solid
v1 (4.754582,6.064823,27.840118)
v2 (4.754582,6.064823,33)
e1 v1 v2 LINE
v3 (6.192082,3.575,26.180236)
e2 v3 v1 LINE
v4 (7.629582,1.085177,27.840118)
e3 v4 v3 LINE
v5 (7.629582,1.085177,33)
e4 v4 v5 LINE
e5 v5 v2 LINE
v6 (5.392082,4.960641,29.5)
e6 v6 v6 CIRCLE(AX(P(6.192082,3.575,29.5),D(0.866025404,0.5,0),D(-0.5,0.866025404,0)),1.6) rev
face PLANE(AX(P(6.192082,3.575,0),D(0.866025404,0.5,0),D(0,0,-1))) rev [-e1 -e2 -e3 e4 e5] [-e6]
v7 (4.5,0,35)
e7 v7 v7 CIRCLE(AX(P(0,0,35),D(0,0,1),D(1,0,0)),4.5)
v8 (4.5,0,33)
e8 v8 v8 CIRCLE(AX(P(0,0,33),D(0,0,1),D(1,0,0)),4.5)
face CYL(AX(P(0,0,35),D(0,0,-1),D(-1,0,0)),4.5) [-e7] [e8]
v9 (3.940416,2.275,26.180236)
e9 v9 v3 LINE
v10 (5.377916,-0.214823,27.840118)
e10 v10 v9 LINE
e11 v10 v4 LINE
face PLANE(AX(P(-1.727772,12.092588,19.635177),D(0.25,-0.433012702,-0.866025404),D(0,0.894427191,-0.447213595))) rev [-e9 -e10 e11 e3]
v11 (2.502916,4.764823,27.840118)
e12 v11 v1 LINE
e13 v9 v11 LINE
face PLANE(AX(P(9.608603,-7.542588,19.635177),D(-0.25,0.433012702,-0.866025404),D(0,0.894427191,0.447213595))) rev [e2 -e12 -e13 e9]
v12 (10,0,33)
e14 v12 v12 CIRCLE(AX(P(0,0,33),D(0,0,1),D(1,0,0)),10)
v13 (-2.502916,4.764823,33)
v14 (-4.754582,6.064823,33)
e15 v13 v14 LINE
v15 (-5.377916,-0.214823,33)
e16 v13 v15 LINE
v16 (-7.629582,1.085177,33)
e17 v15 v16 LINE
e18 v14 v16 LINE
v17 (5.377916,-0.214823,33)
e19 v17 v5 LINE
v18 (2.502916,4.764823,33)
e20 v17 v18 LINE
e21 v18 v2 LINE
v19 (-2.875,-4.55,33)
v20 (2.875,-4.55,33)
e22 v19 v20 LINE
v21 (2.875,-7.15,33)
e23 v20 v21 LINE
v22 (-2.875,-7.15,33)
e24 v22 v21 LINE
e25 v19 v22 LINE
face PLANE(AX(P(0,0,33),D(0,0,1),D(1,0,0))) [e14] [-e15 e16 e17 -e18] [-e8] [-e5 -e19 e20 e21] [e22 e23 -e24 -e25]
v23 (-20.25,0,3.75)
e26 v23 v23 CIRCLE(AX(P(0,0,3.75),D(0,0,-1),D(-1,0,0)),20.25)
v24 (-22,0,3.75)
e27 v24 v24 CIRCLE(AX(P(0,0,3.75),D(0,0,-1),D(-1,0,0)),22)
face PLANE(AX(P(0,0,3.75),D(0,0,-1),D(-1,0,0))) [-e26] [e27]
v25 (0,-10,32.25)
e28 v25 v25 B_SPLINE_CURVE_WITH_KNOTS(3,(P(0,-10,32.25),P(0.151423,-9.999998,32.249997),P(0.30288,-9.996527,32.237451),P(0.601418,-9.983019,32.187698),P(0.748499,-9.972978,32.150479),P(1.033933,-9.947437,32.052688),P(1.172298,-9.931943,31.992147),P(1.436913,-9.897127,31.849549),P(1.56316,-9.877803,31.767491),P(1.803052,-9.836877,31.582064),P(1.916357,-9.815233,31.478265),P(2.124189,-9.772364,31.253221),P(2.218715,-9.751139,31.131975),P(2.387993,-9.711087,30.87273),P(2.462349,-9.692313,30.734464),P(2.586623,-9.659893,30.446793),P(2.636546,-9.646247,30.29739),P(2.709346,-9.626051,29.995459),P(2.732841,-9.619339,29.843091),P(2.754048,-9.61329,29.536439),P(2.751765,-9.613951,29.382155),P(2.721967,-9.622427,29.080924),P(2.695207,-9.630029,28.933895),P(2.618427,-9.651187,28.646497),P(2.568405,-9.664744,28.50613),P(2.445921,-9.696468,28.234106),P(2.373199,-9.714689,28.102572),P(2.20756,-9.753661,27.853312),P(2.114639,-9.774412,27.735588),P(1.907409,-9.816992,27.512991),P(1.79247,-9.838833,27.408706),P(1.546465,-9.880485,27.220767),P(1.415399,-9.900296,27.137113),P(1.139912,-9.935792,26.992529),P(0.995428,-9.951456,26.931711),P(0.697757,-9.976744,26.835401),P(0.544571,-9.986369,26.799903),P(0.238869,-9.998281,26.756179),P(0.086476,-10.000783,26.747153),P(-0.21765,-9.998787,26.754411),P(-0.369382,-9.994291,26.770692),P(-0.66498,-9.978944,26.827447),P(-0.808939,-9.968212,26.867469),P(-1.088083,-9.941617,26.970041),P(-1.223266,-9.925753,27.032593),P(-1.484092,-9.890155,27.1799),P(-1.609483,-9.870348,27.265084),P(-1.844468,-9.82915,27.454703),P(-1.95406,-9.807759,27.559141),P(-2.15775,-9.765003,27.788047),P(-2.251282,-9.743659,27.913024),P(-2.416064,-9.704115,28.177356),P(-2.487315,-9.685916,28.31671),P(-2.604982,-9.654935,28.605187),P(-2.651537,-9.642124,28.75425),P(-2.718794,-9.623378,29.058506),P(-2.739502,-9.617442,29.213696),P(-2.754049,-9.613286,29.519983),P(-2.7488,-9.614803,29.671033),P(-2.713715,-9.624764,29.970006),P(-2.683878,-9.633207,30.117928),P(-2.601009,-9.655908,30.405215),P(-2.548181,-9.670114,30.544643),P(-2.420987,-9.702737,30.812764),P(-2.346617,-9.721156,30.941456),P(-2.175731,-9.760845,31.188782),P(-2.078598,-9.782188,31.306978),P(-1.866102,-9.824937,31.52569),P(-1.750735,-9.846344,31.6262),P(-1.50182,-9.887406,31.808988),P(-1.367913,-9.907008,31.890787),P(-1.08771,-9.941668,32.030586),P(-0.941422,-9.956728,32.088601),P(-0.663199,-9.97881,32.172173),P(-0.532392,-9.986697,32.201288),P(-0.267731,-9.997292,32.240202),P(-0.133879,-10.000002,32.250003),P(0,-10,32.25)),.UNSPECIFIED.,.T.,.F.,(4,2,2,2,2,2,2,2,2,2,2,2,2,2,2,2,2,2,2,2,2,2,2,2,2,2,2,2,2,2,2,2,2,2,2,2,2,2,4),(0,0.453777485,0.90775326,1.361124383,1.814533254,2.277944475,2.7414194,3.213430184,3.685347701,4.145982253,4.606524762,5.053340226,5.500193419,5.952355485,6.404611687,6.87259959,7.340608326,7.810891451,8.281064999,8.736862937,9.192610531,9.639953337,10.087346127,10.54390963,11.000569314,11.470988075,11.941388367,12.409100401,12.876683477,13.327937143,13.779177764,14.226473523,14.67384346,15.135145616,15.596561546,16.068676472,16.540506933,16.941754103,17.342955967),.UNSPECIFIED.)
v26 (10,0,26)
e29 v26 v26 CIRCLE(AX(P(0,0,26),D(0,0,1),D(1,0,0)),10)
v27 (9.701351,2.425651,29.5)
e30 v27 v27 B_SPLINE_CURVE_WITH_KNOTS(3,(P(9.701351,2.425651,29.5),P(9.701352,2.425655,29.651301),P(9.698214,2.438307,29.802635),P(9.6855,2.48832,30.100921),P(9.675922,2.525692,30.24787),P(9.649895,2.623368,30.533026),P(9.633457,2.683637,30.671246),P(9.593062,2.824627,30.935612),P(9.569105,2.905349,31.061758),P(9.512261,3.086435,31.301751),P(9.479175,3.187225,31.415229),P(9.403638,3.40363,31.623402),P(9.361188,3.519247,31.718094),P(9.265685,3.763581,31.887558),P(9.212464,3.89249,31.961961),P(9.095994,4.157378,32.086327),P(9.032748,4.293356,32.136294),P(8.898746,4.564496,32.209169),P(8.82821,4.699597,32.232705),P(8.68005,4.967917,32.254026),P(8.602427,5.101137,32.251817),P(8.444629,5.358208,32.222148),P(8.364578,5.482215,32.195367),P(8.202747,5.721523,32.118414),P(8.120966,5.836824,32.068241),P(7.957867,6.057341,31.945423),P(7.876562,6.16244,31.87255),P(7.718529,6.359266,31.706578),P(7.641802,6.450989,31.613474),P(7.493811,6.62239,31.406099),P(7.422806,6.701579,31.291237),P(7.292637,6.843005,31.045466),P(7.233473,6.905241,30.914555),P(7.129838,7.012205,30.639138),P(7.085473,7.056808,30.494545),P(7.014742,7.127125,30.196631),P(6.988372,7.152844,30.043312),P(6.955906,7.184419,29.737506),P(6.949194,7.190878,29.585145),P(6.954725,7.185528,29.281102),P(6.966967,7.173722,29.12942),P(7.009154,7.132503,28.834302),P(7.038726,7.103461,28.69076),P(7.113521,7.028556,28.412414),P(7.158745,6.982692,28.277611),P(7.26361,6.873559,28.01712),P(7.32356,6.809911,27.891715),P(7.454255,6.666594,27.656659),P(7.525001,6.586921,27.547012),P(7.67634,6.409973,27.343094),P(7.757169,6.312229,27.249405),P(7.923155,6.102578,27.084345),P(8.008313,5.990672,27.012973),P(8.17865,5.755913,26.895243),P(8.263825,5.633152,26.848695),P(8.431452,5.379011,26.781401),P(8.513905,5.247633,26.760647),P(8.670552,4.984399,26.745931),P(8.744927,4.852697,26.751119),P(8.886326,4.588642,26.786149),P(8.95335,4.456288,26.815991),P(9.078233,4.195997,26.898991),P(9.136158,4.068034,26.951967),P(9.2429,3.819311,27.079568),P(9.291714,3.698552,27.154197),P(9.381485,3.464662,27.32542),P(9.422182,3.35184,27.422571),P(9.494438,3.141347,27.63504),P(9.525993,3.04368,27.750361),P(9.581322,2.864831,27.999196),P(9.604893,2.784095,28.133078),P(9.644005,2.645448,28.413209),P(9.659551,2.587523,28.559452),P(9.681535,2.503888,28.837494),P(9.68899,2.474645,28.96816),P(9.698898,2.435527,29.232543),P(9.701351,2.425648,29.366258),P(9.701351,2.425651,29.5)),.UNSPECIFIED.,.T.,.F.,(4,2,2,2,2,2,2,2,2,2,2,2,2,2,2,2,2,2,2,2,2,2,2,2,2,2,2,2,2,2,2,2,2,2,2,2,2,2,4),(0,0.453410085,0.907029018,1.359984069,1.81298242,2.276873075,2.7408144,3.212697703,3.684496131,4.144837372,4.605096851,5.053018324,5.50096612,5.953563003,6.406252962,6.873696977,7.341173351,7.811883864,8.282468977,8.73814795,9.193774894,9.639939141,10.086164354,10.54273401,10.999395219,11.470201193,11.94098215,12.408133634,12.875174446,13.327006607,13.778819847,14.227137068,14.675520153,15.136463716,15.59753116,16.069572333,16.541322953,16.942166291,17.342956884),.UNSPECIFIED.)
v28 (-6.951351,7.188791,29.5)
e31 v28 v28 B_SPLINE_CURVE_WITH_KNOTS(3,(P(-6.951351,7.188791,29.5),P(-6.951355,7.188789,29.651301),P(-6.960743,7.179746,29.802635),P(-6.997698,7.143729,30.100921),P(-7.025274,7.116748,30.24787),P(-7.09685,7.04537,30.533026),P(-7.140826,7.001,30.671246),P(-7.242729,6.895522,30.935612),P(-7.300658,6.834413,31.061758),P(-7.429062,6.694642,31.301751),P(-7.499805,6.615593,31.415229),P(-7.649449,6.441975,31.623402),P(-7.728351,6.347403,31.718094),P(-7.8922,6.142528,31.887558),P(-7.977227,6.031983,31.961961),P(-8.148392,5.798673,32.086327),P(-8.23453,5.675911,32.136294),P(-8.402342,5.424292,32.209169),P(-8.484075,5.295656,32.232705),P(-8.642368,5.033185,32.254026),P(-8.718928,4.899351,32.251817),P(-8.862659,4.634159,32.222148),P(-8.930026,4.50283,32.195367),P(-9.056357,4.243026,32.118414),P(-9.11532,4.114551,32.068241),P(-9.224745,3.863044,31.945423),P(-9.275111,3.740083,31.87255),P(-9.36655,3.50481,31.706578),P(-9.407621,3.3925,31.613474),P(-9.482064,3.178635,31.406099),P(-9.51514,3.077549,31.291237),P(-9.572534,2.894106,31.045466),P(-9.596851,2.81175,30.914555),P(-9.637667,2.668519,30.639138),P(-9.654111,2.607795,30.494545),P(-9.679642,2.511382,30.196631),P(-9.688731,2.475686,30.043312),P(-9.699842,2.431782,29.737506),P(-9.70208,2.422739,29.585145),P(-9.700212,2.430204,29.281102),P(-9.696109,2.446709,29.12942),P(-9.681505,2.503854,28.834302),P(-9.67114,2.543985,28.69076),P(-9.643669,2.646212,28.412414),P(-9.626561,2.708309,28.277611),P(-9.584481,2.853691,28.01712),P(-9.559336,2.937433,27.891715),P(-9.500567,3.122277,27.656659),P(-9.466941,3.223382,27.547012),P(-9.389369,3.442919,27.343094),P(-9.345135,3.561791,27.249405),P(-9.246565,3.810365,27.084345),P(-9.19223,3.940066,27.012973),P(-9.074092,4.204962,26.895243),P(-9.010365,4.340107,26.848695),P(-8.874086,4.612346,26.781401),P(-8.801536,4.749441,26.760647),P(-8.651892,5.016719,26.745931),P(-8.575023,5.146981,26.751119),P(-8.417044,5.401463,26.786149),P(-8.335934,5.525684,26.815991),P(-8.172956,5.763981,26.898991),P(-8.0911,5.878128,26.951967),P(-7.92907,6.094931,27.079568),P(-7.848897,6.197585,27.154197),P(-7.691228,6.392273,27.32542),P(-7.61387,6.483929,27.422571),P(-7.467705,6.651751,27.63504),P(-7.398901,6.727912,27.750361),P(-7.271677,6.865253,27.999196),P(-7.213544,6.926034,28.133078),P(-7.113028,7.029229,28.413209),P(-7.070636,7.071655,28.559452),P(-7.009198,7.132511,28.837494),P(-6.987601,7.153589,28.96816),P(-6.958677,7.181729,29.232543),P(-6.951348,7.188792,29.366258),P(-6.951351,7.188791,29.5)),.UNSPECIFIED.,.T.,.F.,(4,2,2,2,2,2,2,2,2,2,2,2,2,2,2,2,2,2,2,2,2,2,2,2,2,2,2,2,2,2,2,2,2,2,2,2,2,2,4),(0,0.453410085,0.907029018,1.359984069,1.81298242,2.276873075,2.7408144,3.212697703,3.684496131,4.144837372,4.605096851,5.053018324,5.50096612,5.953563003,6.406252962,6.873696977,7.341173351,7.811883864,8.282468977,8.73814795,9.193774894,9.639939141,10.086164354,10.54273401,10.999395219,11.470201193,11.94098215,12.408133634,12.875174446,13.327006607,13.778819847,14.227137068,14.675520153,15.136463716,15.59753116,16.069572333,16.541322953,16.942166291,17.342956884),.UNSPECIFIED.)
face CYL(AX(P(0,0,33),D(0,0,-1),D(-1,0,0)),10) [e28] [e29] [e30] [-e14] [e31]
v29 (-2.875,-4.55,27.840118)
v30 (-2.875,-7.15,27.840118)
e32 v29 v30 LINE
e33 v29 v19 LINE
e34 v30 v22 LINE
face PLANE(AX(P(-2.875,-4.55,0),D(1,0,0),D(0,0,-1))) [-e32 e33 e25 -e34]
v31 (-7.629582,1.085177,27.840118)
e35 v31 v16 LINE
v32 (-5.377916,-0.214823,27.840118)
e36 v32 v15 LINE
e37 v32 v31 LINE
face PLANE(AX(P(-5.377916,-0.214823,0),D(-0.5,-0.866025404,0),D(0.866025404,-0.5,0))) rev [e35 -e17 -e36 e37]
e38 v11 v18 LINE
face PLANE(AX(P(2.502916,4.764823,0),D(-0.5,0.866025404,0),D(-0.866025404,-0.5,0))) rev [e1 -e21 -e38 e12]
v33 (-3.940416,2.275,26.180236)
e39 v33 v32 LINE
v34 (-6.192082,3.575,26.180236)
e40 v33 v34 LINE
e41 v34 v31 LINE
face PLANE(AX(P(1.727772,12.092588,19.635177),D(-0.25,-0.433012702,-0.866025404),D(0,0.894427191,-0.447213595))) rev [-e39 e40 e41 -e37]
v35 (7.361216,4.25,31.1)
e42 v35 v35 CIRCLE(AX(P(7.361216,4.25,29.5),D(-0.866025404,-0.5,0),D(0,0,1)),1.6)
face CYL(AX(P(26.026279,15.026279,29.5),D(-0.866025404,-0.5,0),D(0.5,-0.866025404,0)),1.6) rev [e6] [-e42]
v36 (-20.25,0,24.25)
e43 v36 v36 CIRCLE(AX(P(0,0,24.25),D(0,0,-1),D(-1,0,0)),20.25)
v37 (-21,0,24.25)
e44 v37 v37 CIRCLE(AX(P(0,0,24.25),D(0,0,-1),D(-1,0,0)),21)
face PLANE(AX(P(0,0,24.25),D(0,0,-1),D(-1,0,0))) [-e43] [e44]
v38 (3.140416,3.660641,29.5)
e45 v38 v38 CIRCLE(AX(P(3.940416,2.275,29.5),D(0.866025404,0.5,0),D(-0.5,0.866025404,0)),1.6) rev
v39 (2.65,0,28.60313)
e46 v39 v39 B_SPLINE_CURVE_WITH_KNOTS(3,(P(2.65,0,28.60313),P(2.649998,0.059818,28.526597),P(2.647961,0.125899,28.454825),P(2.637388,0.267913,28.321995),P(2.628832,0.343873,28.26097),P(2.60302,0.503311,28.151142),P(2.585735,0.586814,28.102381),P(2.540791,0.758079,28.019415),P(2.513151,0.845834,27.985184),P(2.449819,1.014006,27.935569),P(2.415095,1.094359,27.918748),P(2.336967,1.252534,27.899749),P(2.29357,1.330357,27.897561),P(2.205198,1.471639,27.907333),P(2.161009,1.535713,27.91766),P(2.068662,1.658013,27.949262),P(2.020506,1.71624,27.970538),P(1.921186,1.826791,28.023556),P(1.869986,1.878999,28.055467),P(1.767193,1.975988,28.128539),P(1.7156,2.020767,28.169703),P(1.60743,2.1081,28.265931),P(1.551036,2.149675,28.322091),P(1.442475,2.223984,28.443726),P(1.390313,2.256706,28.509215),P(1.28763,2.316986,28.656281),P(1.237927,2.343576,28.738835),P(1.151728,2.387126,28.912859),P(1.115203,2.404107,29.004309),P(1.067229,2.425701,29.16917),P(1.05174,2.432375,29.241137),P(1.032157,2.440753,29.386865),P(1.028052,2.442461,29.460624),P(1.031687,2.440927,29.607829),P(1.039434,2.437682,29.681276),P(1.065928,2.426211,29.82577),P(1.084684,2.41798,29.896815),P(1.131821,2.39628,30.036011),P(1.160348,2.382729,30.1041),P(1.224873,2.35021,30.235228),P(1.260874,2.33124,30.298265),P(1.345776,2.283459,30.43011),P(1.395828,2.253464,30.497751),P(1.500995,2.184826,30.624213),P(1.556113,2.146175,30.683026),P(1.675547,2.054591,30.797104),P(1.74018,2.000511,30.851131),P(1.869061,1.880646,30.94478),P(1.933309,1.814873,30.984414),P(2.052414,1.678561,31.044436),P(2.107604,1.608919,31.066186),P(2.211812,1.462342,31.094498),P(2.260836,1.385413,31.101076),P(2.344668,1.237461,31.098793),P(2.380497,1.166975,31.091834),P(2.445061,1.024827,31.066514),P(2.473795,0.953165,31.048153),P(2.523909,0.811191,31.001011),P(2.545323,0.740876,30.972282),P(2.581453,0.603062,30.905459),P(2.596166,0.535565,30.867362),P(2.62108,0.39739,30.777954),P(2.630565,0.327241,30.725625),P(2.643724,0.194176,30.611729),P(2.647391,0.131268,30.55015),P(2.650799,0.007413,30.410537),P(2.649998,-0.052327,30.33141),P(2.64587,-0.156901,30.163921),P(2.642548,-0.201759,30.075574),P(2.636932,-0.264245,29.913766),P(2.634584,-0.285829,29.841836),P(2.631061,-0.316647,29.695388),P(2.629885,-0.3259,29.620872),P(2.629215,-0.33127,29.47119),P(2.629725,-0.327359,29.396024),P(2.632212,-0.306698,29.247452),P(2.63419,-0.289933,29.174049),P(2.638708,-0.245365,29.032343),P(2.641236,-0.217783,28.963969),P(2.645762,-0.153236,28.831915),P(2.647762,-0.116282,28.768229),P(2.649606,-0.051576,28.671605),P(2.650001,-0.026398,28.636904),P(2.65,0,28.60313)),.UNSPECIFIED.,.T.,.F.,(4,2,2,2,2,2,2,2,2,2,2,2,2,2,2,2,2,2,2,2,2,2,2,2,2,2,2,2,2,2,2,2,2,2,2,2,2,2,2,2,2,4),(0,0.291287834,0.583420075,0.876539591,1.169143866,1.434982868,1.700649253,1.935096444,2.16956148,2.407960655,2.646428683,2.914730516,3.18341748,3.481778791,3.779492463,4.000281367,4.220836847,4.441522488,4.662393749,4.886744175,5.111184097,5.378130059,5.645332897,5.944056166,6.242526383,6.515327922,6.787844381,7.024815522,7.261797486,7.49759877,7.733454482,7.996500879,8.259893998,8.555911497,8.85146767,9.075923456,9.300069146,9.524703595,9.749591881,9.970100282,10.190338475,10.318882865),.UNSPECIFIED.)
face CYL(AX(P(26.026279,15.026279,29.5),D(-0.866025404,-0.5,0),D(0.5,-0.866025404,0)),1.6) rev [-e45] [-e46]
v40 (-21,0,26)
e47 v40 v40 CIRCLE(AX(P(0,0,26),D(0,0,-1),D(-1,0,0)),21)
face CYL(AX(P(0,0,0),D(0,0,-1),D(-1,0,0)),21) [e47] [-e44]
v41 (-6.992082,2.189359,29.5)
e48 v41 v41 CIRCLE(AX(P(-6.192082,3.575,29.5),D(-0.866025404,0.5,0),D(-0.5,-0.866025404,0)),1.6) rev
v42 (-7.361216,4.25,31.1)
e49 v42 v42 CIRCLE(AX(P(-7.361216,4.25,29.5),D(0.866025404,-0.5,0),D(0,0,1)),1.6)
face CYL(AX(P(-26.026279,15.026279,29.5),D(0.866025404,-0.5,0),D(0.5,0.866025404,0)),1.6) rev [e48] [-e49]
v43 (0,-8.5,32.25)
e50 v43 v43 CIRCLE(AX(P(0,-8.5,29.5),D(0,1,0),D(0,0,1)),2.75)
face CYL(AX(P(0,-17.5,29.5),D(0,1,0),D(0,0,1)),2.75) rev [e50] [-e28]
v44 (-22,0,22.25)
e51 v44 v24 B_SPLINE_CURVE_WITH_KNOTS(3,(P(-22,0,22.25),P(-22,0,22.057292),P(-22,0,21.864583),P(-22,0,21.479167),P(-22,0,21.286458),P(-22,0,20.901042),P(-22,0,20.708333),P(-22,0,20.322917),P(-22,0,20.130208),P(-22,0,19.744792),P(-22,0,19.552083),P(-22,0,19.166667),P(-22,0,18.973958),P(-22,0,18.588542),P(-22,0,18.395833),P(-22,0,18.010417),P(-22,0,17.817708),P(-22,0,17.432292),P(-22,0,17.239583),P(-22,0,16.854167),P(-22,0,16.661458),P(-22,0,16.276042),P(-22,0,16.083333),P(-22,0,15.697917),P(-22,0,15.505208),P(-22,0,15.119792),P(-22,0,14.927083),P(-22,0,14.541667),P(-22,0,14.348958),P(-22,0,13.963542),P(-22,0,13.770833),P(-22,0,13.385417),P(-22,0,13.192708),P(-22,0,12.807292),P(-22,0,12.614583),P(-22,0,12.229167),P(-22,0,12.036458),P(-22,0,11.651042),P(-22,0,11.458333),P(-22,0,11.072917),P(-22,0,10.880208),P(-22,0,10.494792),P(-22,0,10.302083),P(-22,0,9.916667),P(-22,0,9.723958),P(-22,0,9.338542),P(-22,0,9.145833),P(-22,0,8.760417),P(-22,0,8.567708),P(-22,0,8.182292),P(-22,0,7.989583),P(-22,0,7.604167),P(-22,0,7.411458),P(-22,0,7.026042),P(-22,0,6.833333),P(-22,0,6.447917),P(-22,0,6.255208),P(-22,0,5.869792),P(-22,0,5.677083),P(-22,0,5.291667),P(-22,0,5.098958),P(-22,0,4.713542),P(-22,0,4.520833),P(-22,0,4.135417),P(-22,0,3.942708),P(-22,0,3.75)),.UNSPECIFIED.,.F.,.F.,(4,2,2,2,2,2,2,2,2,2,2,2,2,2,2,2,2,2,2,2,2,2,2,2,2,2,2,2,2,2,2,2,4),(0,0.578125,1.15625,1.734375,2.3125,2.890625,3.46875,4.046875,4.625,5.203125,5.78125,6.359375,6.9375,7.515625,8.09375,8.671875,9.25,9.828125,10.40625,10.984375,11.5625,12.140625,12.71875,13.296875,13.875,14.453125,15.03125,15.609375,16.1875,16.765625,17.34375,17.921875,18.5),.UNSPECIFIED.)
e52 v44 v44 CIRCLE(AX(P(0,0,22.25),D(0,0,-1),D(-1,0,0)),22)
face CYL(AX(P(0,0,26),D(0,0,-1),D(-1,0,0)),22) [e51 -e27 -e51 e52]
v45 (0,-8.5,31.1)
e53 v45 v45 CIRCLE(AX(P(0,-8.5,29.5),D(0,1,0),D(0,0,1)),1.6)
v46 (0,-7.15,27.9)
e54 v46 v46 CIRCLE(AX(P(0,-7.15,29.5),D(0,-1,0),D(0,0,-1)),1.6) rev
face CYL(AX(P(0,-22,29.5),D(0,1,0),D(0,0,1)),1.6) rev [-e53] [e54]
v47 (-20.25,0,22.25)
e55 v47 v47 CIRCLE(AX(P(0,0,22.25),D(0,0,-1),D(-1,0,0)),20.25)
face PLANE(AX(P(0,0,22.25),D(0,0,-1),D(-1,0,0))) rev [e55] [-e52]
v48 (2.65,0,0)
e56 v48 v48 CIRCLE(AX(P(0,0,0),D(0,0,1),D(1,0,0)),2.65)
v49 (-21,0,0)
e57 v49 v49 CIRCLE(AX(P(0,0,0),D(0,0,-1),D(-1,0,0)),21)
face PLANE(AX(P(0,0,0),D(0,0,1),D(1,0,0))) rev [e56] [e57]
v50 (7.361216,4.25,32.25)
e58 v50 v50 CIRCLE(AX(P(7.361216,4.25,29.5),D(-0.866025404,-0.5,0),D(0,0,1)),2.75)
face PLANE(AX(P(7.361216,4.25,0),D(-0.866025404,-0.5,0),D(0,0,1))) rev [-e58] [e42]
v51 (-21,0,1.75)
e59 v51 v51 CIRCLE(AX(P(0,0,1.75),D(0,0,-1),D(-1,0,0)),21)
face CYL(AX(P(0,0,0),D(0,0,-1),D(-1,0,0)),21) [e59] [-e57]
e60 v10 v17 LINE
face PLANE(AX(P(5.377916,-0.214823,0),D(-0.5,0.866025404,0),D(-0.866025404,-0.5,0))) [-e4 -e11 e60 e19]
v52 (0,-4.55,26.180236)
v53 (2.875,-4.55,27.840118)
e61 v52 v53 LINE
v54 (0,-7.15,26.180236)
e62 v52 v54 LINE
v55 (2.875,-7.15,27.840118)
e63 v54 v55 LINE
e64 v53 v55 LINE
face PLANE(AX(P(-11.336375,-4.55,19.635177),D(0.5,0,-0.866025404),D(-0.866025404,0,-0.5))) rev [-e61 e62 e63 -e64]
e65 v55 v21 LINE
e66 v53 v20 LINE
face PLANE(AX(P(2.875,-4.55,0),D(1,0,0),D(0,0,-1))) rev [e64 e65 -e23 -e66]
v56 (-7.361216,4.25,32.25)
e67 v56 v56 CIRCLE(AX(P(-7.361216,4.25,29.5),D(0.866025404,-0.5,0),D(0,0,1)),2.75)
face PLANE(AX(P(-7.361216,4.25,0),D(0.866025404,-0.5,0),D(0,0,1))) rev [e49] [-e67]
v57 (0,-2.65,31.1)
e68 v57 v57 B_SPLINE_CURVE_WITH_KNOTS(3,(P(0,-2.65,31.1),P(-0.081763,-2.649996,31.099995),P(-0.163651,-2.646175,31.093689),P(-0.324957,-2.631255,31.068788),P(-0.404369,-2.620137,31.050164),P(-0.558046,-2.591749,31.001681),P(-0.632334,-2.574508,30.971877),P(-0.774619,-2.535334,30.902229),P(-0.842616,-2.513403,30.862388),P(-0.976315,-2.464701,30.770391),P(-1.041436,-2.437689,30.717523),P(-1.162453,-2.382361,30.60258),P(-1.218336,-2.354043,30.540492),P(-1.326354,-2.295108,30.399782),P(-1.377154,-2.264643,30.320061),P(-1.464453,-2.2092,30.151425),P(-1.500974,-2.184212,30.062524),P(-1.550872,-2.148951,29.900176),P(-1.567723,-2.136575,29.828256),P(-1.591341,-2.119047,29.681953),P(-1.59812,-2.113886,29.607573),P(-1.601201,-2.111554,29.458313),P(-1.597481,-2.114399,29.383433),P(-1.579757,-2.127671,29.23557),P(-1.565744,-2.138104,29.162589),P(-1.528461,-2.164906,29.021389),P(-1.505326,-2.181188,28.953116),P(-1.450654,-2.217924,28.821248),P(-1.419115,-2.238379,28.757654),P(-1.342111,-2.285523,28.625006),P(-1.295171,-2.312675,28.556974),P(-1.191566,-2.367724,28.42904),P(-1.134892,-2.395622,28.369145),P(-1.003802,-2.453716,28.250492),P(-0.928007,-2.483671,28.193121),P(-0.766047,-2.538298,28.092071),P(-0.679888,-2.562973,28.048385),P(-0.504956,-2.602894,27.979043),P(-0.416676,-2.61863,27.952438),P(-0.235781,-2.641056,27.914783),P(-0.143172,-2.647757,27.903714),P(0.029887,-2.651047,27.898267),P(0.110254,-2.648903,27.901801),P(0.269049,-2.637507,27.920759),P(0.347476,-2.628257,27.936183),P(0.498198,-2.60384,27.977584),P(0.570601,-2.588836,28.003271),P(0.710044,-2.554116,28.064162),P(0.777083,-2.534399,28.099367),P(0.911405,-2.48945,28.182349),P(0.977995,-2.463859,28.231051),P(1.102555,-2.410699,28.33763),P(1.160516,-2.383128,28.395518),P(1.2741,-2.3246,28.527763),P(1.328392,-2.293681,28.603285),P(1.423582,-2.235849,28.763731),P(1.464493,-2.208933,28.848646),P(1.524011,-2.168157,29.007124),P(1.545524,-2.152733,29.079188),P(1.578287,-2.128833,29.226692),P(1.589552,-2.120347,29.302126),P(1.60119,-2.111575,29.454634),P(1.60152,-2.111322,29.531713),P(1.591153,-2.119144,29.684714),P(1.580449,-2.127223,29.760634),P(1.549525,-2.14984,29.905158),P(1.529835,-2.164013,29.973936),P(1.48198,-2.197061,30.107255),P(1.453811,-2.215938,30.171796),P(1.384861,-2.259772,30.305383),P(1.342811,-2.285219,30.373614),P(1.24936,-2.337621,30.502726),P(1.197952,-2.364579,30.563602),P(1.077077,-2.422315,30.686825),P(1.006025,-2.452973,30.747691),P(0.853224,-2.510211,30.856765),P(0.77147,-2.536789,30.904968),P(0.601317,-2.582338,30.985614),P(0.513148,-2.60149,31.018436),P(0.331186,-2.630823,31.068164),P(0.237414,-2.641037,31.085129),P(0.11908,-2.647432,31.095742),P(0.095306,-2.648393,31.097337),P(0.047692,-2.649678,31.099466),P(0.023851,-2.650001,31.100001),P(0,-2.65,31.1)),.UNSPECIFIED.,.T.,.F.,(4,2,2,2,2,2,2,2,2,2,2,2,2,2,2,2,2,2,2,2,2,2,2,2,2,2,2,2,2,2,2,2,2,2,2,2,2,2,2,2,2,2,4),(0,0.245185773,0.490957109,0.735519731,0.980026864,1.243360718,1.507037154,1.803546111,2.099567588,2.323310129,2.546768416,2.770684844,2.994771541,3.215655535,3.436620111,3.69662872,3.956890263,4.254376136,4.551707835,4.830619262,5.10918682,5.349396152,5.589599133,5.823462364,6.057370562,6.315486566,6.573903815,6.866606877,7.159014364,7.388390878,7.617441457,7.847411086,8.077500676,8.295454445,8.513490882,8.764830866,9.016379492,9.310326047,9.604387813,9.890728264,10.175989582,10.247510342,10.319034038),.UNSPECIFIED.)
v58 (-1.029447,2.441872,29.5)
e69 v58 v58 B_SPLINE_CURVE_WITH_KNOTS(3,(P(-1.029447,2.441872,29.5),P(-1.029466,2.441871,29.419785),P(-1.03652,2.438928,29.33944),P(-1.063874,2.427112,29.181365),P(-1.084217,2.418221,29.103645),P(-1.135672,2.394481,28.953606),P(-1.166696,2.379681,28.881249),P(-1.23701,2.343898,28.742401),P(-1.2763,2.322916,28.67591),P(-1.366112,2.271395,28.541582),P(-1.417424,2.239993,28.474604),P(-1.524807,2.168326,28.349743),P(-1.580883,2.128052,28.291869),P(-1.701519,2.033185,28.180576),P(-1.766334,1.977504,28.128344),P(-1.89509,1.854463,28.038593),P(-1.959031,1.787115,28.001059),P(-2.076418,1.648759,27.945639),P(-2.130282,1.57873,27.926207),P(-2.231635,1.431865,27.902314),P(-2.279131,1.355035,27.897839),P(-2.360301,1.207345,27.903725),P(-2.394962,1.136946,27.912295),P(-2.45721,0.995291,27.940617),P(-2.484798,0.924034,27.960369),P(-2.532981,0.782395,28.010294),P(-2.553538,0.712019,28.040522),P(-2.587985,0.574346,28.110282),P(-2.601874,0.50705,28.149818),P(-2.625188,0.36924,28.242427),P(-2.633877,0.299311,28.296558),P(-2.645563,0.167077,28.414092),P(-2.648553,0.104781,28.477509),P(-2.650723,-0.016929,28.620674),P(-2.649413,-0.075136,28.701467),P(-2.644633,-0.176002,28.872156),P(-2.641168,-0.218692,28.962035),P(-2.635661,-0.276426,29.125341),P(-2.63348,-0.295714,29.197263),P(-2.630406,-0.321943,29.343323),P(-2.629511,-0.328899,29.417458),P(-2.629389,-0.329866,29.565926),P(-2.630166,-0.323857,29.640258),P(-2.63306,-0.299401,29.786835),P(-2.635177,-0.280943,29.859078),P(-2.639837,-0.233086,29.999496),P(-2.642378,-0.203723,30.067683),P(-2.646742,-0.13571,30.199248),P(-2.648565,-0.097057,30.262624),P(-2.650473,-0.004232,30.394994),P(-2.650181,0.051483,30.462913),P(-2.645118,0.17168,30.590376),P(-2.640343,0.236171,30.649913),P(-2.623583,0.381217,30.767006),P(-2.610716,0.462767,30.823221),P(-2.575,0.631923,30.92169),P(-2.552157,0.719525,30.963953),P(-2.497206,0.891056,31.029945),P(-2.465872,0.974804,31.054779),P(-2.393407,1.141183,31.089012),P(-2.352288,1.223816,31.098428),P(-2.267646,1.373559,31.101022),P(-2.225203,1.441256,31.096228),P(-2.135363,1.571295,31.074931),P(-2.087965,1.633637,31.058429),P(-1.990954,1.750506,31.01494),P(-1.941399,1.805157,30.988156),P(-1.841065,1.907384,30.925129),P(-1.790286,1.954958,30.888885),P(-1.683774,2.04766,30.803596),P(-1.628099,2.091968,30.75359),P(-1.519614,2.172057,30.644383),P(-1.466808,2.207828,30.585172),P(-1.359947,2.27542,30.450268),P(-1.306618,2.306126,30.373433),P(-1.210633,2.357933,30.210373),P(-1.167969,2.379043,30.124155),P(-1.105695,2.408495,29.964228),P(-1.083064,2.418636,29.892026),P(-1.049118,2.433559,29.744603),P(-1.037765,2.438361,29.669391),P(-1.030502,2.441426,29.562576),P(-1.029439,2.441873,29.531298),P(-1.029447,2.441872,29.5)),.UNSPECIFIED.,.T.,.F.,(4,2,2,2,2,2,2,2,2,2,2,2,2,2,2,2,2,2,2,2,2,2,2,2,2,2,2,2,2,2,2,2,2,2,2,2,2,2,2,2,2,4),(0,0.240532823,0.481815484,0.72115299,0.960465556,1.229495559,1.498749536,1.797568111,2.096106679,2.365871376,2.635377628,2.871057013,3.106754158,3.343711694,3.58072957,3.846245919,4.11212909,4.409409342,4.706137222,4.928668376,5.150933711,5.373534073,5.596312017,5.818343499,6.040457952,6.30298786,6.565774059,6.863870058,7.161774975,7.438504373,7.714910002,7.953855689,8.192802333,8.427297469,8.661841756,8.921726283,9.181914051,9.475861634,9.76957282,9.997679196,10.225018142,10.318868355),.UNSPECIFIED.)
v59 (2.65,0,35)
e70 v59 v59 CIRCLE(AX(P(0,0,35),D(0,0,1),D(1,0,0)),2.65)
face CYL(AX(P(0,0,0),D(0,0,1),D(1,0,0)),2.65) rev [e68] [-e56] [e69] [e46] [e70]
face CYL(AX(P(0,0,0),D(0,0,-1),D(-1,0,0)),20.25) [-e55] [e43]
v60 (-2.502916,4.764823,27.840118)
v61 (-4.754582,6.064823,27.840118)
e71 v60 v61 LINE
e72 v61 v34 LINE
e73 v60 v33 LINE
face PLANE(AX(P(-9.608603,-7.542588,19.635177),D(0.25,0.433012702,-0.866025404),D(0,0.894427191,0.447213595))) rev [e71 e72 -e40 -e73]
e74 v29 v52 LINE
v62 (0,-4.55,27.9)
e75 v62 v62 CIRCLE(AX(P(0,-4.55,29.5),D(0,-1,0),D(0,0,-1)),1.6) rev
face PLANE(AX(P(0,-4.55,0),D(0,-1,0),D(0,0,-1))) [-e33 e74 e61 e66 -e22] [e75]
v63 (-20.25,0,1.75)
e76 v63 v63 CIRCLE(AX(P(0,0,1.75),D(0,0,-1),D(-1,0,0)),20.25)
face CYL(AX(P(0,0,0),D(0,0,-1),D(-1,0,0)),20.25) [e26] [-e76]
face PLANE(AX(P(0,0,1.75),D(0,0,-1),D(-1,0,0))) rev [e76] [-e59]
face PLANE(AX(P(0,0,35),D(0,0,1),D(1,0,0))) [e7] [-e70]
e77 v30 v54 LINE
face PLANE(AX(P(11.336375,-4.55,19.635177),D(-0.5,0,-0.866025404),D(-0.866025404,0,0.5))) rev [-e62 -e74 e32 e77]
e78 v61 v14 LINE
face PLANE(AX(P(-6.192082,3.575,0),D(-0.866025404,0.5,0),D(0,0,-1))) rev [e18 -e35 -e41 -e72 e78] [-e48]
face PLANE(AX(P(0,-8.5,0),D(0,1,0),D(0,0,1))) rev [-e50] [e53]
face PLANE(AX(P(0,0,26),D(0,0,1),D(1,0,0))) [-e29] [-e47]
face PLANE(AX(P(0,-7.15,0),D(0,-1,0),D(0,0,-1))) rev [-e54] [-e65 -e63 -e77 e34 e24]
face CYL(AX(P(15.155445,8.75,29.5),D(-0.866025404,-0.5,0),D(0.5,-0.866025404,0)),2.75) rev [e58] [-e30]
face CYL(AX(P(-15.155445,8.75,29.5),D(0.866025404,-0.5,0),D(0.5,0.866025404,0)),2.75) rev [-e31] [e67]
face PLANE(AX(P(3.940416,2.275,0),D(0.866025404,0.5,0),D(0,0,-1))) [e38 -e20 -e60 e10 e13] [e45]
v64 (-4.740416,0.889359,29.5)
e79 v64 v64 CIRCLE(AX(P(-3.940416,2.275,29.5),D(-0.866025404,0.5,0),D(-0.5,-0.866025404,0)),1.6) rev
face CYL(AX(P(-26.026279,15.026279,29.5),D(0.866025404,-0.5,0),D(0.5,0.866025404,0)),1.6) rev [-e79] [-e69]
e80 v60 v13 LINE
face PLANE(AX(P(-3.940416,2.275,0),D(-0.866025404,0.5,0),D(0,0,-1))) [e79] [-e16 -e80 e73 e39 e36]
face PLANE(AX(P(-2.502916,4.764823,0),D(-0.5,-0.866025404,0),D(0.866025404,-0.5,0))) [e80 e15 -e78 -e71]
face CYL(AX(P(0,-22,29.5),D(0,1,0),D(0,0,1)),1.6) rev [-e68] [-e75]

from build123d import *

# Parameters (mm, degrees)
EXTRUDE_1_OUTLINE_R      = 22
EXTRUDE_1_DEPTH          = 26
SKETCH_2_W               = 1.75
SKETCH_2_H               = 1
SKETCH_2_W_2             = 2
SKETCH_2_H_2             = 1.75
SKETCH_3_R               = 2.65
CUT_EXTRUDE_1_DEPTH      = 41.546269865
EXTRUDE_START            = 7
SKETCH_4_R               = 10
SKETCH_4_R_2             = 2.65
EXTRUDE_2_DEPTH          = 7
SKETCH_5_R               = 1.6
CUT_EXTRUDE_2_DEPTH      = 46.354161882
CUT_EXTRUDE_START        = -8.5
SKETCH_6_R               = 2.75
SKETCH_6_R_2             = 1.6
CUT_EXTRUDE_3_DEPTH      = 9
CUT_EXTRUDE_START_2      = -9.45
CUT_EXTRUDE_4_OUTLINE_R  = 1.6
CUT_EXTRUDE_4_DEPTH      = 2.6
PATTERN_CIRCULAR_1_COUNT = 3
EXTRUDE_START_2          = 2
SKETCH_8_R               = 4.5
SKETCH_8_R_2             = 2.65
EXTRUDE_3_DEPTH          = 2


# Read off the part's stored shape, not the designer's step: Бобышка-Вытянуть1, Вырез-Вытянуть4
with BuildPart() as part:
    # Бобышка-Вытянуть1 outline → Бобышка-Вытянуть1 (new body)
    with BuildSketch(Plane.XY):
        Circle(EXTRUDE_1_OUTLINE_R)
    extrude(amount=EXTRUDE_1_DEPTH)

    # Эскиз2 → Вырез-Повернуть1 (revolve, cut)
    with BuildSketch(Plane(origin=(0, 0, 0), x_dir=(0, 0, -1), z_dir=(1, 0, 0)), mode=Mode.PRIVATE) as cut_revolve_1_sk:
        Polygon((-3.75, 22), (-3.75, 20.25), (-1.75, 20.25), (-1.75, 21), (-1.75, 22), align=None)
        Polygon((-24.25, 21), (-24.25, 20.25), (-22.25, 20.25), (-22.25, 22), (-24.25, 22), align=None)
        with Locations((-25.125, 21.5)):
            Rectangle(SKETCH_2_W, SKETCH_2_H)
        with Locations((-23.25, 21.125)):
            Rectangle(SKETCH_2_W_2, SKETCH_2_H_2)
        with Locations((-2.75, 21.125)):
            Rectangle(SKETCH_2_W_2, SKETCH_2_H_2)
        with Locations((-0.875, 21.5)):
            Rectangle(SKETCH_2_W, SKETCH_2_H)
    revolve(cut_revolve_1_sk.sketch.rotate(Axis((0, 0, 0), (0, 0, 1)), 90), axis=Axis((0, 0, 0), (0, 0, 1)), mode=Mode.SUBTRACT)

    # Эскиз3 → Вырез-Вытянуть1 (cut, through all)
    with BuildSketch(Plane.XY.offset(26)):
        Circle(SKETCH_3_R)
    extrude(amount=-CUT_EXTRUDE_1_DEPTH, mode=Mode.SUBTRACT)

    # Эскиз4 → Бобышка-Вытянуть2 (add)
    with BuildSketch(Plane.XY.offset(26).offset(EXTRUDE_START)):
        Circle(SKETCH_4_R)
        Circle(SKETCH_4_R_2, mode=Mode.SUBTRACT)
    extrude(amount=-EXTRUDE_2_DEPTH)

    # Эскиз5 → Вырез-Вытянуть2 (cut, through all)
    with BuildSketch(Plane(origin=(0, 0, 0), x_dir=(1, 0, 0), z_dir=(0, 1, 0))):
        with Locations(Location((0, -29.5, 0), (0, 0, 270))):
            Circle(SKETCH_5_R)
    cut_extrude_2 = extrude(amount=-CUT_EXTRUDE_2_DEPTH, mode=Mode.SUBTRACT)

    # Эскиз6 → Вырез-Вытянуть3 (cut)
    with BuildSketch(Plane(origin=(0, 0, 0), x_dir=(1, 0, 0), z_dir=(0, 1, 0)).offset(CUT_EXTRUDE_START)):
        with Locations(Location((0, -29.5, 0), (0, 0, 270))):
            Circle(SKETCH_6_R)
        with Locations(Location((0, -29.5, 0), (0, 0, 270))):
            Circle(SKETCH_6_R_2, mode=Mode.SUBTRACT)
    cut_extrude_3 = extrude(amount=-CUT_EXTRUDE_3_DEPTH, mode=Mode.SUBTRACT)

    # Вырез-Вытянуть4 outline → Вырез-Вытянуть4 (cut)
    with BuildSketch(Plane.XZ.offset(14).offset(CUT_EXTRUDE_START_2)):
        Polygon((-2.875, 27.840117976), (0, 26.180235952), (2.875, 27.840117976), (2.875, 33), (-2.875, 33), align=None)
        with Locations((0, 29.5)):
            Circle(CUT_EXTRUDE_4_OUTLINE_R, mode=Mode.SUBTRACT)
    cut_extrude_4 = extrude(amount=CUT_EXTRUDE_4_DEPTH, mode=Mode.SUBTRACT)

    # Круговой массив1: Вырез-Вытянуть2, Вырез-Вытянуть3, Вырез-Вытянуть4 ×3 about axis
    pattern_circular_1_axis = Axis((0, 0, 0), (0, 0, 1))
    add([cut_extrude_2.rotate(pattern_circular_1_axis, i * 360 / PATTERN_CIRCULAR_1_COUNT) for i in range(1, PATTERN_CIRCULAR_1_COUNT)], mode=Mode.SUBTRACT)
    add([cut_extrude_3.rotate(pattern_circular_1_axis, i * 360 / PATTERN_CIRCULAR_1_COUNT) for i in range(1, PATTERN_CIRCULAR_1_COUNT)], mode=Mode.SUBTRACT)
    add([cut_extrude_4.rotate(pattern_circular_1_axis, i * 360 / PATTERN_CIRCULAR_1_COUNT) for i in range(1, PATTERN_CIRCULAR_1_COUNT)], mode=Mode.SUBTRACT)

    # Эскиз8 → Бобышка-Вытянуть3 (add)
    with BuildSketch(Plane.XY.offset(33).offset(EXTRUDE_START_2)):
        Circle(SKETCH_8_R)
        Circle(SKETCH_8_R_2, mode=Mode.SUBTRACT)
    extrude(amount=-EXTRUDE_3_DEPTH)


solid = part.part
